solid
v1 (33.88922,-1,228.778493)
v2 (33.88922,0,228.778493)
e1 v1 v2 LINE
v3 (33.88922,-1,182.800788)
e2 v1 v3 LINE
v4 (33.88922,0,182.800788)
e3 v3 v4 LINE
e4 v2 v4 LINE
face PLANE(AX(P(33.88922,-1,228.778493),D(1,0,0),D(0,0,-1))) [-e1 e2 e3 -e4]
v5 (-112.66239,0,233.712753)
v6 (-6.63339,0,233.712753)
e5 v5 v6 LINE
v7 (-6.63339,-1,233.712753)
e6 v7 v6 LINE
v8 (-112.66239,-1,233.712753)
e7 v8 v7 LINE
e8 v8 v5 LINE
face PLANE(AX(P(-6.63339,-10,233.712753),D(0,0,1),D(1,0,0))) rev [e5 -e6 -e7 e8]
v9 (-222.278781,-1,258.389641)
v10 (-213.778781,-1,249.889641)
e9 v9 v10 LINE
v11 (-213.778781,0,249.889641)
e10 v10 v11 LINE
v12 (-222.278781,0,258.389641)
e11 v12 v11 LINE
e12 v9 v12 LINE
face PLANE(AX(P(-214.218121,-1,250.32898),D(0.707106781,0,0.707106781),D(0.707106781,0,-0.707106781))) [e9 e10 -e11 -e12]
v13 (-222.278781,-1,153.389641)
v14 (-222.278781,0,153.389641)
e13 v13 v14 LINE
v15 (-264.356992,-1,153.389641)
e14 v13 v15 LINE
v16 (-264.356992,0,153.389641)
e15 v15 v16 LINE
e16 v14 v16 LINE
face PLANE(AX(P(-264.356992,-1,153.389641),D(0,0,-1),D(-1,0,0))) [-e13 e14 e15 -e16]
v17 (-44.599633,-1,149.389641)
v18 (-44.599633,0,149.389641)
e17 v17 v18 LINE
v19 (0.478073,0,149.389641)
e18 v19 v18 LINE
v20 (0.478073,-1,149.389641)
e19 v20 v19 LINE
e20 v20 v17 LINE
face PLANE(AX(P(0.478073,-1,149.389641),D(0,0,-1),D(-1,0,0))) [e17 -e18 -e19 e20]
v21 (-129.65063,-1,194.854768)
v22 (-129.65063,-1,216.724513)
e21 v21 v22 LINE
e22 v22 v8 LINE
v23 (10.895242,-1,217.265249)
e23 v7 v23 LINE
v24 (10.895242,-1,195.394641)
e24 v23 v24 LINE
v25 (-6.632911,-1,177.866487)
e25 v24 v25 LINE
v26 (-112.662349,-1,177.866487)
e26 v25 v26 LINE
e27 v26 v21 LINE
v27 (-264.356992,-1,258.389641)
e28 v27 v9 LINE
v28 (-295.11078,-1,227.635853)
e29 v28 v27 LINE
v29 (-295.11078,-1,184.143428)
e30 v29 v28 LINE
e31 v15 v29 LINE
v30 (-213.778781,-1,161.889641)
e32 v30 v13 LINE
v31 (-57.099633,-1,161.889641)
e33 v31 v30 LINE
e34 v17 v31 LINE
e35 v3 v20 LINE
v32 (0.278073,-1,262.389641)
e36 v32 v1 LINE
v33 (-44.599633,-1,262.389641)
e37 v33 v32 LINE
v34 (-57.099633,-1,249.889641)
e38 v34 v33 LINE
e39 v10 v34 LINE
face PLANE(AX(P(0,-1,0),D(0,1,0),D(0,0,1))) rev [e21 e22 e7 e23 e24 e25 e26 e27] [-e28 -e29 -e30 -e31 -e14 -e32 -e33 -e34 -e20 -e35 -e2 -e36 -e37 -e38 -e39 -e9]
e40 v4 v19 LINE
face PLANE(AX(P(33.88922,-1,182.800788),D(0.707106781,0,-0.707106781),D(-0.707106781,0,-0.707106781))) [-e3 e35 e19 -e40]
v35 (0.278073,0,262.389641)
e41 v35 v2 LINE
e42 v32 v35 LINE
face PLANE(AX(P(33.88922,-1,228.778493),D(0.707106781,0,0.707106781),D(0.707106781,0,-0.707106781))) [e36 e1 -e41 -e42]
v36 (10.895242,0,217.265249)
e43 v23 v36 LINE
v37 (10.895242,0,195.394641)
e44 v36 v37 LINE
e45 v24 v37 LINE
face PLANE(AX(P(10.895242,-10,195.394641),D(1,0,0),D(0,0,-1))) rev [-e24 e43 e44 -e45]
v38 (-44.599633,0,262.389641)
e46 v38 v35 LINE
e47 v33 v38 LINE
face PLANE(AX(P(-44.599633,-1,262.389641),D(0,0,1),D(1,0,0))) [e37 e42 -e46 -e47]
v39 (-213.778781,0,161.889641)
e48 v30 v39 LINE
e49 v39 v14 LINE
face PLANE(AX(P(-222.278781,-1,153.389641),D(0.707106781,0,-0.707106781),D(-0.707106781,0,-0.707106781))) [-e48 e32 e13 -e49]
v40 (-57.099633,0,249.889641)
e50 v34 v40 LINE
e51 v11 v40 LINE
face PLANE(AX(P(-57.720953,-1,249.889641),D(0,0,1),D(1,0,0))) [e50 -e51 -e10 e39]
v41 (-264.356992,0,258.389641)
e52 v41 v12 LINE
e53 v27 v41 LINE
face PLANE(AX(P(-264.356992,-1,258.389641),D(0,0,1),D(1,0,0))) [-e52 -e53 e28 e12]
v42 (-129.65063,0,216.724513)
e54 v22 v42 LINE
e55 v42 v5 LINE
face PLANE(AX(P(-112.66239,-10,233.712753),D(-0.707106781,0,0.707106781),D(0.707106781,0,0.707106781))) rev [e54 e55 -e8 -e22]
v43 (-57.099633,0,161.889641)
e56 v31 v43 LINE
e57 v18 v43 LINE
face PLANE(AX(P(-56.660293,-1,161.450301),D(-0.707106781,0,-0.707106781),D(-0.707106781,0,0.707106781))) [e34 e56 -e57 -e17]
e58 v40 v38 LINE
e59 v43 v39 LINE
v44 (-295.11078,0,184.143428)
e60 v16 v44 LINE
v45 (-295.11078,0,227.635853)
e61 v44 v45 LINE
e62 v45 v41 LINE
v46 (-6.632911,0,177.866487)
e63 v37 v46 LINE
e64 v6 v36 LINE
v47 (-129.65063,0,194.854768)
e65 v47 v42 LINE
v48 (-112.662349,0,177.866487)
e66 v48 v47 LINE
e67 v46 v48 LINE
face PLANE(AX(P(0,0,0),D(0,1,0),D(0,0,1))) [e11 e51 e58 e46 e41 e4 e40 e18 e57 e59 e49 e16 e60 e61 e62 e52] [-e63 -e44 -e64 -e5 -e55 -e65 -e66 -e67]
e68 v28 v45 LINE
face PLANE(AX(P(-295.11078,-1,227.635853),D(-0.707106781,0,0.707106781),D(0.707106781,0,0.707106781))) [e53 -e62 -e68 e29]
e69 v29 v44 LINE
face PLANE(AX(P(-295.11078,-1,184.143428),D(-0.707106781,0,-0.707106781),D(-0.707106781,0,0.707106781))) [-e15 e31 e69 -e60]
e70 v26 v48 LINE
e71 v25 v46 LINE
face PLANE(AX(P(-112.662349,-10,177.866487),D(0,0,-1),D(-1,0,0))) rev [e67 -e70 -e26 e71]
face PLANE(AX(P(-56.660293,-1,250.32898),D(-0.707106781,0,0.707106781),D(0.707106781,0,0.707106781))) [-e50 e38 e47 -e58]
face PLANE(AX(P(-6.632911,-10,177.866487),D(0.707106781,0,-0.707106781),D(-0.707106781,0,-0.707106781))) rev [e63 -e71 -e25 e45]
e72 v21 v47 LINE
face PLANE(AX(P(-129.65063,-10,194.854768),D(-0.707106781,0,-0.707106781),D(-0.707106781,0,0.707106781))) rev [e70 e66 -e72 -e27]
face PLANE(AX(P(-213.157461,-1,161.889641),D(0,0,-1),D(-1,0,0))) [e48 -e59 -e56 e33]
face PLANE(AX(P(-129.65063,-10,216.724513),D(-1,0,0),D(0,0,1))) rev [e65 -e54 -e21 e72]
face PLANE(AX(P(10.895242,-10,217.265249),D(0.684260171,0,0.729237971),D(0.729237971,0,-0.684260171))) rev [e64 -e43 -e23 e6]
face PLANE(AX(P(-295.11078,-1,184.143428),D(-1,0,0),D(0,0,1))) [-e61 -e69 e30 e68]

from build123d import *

# Parameters (mm, degrees)
SM_BASE_FLANGE_1_DEPTH = 1
CUT_EXTRUDE_1_DEPTH    = 10


# Sheet-metal steps are written as plain solids
with BuildPart() as part:
    # Sketch 1 → Базовая кромка1 (new body)
    with BuildSketch(Plane(origin=(0, 0, 0), x_dir=(1, 0, 0), z_dir=(0, 1, 0))):
        Polygon((-57.720952925, -161.889640506), (-213.157461064, -161.889640506), (-213.778781408, -161.889640506), (-214.218121236, -161.450300678), (-222.278781408, -153.389640506), (-264.356991895, -153.389640506), (-295.11077987, -184.143428482), (-295.11077987, -227.635852531), (-264.356991895, -258.389640506), (-222.278781408, -258.389640506), (-214.218121236, -250.328980334), (-213.778781408, -249.889640506), (-213.157461064, -249.889640506), (-57.720952925, -249.889640506), (-57.099632582, -249.889640506), (-56.660292754, -250.328980334), (-44.599632582, -262.389640506), (0.278072842, -262.389640506), (33.88922013, -228.778493218), (33.88922013, -182.800787794), (0.478072842, -149.389640506), (-44.599632582, -149.389640506), (-56.660292754, -161.450300678), (-57.099632582, -161.889640506), align=None)
    extrude(amount=-SM_BASE_FLANGE_1_DEPTH)

    # Эскиз3 → Вырез-Вытянуть1 (cut)
    with BuildSketch(Plane(origin=(0, 0, 0), x_dir=(1, 0, 0), z_dir=(0, 1, 0))):
        Polygon((-129.650630124, -194.854768426), (-112.66234875, -177.866487052), (-6.632911498, -177.866487052), (10.895241956, -195.394640506), (10.895241956, -217.265248922), (-6.633389706, -233.712753004), (-112.662389706, -233.712753004), (-129.650630124, -216.724512586), align=None)
    extrude(amount=-CUT_EXTRUDE_1_DEPTH, mode=Mode.SUBTRACT)


solid = part.part
